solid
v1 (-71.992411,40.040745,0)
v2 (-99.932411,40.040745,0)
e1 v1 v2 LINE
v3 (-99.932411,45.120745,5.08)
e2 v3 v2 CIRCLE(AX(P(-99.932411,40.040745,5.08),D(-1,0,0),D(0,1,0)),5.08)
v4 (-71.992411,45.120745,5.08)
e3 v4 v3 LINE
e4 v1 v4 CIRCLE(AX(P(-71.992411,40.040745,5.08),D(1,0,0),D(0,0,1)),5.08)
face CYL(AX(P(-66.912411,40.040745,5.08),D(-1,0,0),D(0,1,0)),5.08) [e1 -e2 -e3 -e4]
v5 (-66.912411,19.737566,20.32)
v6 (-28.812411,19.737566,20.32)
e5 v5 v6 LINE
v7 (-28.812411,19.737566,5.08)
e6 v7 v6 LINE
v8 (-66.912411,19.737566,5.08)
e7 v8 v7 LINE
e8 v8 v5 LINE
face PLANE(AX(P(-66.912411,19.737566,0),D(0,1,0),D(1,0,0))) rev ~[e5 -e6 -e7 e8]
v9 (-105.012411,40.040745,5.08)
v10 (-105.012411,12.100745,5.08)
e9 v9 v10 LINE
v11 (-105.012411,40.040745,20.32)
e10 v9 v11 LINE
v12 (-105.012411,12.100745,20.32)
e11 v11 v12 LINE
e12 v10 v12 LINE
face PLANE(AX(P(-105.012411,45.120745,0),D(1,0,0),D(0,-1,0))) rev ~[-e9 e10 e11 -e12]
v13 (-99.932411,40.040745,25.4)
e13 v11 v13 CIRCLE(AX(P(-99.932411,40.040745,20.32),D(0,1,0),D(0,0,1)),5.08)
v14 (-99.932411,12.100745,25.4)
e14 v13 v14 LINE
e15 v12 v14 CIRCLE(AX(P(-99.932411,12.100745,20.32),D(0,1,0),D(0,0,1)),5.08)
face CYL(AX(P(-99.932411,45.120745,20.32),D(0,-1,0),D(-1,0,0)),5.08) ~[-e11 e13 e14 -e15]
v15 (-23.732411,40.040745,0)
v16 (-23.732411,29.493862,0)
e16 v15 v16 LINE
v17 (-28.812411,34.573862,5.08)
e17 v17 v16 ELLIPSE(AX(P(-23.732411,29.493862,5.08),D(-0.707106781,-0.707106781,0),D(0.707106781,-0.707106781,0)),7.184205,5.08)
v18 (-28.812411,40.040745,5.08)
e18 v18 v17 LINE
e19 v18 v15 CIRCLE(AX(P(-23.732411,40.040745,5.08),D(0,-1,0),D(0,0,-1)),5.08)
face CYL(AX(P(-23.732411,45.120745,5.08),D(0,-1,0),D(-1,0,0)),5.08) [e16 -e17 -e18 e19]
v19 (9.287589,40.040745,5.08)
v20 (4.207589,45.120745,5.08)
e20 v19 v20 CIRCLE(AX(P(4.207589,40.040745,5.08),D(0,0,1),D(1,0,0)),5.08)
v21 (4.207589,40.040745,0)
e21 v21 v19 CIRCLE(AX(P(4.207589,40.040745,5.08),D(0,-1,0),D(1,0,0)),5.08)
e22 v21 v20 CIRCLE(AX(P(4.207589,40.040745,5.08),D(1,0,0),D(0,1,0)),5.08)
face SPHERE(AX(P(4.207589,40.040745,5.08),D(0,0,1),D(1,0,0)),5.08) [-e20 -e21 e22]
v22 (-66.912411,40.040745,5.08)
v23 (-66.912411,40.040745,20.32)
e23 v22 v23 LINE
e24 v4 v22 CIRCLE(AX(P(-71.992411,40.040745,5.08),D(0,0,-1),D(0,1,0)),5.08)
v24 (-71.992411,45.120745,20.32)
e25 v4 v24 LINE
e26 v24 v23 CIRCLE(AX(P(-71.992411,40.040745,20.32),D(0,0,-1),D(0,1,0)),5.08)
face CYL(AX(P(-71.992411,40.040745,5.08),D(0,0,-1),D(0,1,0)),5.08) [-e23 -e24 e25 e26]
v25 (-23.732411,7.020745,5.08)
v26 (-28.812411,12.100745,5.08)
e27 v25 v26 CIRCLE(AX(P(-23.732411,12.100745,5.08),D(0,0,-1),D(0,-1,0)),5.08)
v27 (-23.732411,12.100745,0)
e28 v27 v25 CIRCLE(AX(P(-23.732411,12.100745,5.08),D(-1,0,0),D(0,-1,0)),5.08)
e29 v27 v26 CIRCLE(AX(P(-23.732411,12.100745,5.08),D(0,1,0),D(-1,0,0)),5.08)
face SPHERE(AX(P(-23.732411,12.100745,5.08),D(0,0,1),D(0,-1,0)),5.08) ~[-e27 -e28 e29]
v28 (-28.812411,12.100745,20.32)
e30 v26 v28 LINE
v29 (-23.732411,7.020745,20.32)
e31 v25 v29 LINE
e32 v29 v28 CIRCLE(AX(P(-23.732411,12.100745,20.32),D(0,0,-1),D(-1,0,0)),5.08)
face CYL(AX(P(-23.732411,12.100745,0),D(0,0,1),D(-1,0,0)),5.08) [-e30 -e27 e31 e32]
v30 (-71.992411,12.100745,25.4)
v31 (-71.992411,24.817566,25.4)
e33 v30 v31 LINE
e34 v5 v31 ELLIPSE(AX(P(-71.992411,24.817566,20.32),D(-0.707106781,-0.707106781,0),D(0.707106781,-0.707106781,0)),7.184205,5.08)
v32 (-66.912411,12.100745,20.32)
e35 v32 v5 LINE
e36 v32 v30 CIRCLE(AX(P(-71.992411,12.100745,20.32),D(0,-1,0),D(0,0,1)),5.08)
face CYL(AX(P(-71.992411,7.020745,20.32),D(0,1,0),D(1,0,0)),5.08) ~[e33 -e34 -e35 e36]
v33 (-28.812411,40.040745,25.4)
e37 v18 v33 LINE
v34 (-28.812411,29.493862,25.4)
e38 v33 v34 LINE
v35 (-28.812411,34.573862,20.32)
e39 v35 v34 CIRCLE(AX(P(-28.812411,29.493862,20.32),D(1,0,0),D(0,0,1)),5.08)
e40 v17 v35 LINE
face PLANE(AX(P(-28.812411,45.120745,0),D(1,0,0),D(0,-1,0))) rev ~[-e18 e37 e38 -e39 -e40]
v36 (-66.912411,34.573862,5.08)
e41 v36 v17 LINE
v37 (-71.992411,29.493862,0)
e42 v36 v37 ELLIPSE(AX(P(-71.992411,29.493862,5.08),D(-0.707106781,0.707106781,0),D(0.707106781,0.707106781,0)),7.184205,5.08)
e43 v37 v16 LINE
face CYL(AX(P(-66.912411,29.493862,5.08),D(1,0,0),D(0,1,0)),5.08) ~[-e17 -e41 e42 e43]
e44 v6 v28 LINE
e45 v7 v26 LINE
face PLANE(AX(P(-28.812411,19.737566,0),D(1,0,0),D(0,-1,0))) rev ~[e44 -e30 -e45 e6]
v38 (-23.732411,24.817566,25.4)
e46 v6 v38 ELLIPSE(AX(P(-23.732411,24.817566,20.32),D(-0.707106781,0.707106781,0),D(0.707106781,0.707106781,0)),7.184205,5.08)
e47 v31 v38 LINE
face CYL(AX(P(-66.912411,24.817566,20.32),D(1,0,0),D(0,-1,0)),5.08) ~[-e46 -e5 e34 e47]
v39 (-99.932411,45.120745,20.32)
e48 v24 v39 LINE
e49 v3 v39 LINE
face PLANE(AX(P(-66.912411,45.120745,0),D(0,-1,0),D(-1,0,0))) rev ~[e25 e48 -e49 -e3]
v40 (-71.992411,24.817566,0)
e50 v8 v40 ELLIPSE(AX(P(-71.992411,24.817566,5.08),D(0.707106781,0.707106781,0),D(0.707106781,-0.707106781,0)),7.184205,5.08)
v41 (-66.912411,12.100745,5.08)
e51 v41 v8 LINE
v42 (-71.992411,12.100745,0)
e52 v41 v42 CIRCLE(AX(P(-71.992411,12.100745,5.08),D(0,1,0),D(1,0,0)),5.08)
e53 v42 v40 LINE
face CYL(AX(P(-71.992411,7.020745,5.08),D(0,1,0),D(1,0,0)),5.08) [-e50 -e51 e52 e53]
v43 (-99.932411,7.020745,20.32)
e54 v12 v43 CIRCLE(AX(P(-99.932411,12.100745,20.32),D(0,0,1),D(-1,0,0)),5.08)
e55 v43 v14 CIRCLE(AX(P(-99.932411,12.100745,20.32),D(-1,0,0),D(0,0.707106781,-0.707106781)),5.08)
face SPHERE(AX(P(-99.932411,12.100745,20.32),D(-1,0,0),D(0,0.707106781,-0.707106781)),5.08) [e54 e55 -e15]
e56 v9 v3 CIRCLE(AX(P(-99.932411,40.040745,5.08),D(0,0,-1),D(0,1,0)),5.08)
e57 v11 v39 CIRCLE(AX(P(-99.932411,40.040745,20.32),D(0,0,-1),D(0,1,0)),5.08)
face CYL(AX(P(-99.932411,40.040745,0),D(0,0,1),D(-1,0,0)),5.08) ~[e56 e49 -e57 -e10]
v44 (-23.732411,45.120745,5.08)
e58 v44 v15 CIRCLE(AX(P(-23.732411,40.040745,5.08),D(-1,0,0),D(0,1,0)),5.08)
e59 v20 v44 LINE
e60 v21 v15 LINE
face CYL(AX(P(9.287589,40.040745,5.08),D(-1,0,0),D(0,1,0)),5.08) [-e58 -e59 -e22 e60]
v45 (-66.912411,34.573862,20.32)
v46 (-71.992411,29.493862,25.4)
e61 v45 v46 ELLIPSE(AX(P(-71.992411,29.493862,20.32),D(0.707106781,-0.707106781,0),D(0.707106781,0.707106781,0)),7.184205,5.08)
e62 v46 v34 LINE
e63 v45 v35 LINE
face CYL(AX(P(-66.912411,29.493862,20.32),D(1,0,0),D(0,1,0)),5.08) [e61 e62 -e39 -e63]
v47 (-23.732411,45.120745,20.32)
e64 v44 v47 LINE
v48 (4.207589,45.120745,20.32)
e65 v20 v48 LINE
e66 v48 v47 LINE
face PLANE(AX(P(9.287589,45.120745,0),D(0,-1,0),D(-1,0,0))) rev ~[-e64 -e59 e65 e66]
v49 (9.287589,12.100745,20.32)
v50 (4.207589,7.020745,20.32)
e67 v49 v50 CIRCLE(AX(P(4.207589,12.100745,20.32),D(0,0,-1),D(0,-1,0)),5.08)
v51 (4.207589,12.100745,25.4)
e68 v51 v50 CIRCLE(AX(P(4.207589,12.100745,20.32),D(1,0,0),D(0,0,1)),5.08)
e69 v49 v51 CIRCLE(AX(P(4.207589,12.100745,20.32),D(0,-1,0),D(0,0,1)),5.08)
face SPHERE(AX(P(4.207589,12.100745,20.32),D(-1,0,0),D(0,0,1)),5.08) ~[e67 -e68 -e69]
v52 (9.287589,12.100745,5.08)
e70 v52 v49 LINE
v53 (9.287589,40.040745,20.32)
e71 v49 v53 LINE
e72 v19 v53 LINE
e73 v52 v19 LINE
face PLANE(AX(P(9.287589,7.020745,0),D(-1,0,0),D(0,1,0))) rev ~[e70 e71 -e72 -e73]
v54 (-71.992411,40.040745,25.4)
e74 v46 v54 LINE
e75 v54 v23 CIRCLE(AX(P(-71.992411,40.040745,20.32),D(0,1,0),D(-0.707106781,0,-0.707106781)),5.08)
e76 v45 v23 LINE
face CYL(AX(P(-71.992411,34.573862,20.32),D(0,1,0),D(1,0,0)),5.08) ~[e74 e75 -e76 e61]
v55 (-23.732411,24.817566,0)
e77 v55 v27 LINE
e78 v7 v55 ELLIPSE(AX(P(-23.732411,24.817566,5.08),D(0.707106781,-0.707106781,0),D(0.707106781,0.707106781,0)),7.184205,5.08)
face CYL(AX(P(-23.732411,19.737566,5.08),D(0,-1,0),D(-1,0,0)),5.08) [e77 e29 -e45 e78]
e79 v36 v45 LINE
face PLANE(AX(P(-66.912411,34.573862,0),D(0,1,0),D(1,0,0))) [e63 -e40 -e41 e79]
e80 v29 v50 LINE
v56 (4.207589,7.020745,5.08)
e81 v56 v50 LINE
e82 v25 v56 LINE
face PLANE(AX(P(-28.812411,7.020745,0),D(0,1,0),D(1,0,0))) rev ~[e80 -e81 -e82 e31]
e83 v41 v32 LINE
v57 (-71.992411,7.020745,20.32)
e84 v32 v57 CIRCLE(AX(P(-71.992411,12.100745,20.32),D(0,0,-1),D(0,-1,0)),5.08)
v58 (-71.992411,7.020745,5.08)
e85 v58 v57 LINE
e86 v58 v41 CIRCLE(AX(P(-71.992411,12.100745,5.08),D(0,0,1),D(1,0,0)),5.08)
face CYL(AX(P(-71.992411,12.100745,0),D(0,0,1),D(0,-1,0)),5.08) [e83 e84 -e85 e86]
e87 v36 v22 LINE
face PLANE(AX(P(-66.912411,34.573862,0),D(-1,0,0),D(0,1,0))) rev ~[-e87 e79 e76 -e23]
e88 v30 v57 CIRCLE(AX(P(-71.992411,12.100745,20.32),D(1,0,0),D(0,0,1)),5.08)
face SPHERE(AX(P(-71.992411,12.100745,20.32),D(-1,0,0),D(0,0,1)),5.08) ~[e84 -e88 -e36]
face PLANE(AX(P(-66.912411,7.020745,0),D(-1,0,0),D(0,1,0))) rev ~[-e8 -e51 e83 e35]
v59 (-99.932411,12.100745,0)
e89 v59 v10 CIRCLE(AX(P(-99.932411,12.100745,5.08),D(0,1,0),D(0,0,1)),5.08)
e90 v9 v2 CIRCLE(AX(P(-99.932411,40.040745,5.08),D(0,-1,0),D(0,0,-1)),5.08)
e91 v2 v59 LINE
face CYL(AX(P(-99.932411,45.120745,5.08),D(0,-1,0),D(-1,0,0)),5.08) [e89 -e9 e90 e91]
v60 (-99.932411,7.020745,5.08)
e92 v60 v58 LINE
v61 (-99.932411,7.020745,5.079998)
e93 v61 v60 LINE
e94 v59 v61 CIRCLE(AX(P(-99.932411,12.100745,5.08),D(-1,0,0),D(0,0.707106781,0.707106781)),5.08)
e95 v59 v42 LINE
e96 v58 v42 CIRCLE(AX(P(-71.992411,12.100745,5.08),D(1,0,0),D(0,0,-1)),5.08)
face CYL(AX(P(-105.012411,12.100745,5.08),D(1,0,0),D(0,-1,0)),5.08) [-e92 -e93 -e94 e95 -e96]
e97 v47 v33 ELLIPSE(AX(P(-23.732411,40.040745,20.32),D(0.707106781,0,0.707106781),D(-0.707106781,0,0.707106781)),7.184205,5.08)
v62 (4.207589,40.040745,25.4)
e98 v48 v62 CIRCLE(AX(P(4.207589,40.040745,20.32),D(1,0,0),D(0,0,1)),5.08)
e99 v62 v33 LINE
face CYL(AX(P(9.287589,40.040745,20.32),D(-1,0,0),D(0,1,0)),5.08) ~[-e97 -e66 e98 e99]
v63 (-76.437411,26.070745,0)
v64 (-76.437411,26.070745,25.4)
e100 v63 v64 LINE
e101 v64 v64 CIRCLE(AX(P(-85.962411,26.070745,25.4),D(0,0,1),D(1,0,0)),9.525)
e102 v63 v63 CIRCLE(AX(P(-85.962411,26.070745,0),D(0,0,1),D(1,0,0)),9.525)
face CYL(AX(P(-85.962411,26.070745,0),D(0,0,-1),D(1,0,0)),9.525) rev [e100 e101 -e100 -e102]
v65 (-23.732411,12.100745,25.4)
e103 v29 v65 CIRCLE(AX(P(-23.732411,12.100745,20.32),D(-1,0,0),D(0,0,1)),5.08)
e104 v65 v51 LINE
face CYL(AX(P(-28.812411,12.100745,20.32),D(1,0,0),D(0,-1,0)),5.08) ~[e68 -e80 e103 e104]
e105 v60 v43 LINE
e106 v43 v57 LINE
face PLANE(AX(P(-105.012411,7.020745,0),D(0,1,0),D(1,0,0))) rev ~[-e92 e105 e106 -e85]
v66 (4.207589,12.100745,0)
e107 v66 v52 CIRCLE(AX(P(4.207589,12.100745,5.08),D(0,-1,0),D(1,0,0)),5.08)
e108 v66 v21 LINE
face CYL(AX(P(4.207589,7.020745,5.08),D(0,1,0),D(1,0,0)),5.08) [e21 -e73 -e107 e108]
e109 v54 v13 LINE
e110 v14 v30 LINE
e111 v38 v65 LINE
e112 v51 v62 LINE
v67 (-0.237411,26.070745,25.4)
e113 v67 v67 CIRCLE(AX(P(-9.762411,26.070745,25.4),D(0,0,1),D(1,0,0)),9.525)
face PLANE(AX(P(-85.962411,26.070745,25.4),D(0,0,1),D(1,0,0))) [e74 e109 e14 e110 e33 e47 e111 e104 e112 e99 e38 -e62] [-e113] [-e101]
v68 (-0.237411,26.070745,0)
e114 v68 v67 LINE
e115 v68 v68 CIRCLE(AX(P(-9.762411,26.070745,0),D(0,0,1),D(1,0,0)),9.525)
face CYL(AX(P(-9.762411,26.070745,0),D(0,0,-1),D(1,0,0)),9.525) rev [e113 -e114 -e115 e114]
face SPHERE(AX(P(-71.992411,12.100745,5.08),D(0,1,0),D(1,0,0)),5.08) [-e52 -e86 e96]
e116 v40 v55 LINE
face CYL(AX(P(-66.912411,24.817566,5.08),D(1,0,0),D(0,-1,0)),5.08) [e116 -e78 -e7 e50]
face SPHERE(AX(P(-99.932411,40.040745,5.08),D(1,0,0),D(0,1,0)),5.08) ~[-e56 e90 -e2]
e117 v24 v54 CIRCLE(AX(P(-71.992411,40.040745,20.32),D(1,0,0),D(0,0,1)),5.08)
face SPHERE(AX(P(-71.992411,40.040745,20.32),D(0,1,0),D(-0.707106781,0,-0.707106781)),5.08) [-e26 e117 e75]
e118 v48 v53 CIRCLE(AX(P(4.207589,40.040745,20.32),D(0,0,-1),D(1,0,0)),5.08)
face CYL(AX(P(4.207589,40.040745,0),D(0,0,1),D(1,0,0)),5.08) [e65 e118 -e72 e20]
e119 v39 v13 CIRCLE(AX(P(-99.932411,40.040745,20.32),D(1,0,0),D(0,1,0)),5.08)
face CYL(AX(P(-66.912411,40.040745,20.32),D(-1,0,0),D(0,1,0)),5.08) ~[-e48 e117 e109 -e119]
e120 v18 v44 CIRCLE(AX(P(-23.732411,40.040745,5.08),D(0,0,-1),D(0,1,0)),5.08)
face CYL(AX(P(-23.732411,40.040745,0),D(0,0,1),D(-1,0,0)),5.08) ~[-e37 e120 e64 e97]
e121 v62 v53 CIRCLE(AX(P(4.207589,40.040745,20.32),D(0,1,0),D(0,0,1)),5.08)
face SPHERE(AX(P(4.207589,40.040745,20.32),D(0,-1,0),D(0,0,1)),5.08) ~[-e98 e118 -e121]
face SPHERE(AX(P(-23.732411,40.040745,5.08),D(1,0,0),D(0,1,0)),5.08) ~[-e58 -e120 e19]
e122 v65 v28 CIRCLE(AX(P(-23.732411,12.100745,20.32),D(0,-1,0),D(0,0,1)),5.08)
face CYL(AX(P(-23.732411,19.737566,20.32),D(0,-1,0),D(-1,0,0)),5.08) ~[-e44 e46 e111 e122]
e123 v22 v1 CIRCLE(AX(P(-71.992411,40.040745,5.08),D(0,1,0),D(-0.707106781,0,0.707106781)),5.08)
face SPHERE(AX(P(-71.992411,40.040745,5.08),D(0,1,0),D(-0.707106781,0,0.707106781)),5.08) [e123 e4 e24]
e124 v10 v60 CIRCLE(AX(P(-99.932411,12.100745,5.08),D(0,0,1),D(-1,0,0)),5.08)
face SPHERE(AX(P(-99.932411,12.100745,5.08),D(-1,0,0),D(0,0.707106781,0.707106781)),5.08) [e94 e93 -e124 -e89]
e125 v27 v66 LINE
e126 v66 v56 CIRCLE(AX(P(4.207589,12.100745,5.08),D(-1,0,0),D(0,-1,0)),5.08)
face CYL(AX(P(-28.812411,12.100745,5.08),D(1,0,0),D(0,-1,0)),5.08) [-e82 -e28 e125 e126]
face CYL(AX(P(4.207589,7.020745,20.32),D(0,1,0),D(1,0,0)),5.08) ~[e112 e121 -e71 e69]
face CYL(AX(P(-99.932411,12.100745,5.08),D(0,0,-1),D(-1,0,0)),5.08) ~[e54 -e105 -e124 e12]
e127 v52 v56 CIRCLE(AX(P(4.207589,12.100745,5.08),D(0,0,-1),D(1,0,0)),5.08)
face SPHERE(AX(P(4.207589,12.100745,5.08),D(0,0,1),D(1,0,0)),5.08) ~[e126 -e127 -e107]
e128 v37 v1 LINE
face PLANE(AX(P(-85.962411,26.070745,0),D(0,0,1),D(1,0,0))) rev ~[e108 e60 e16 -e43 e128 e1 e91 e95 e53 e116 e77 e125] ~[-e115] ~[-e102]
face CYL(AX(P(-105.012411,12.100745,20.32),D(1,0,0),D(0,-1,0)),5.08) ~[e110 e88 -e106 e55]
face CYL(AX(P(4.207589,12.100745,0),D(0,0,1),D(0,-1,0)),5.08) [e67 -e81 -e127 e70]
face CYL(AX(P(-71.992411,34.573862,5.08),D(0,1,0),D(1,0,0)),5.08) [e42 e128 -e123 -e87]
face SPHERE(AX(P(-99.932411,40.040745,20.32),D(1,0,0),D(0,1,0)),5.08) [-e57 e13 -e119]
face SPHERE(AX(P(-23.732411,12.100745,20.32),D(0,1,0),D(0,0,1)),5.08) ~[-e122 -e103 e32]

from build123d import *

# Parameters (mm, degrees)
F0_R         = 9.525
F0_W         = 38.1
F0_H         = 14.8362964392
F1_DEPTH     = 25.4
F2_R         = 5.08
F3_T1_DEPTH  = 15.24
F3_S5_W      = 5.08
F3_S5_H      = 5.08
F3_T6_DEPTH  = 5.08
F3_S11_W     = 5.08
F3_S11_H     = 5.08
F3_T12_DEPTH = 5.08
F3_S17_W     = 5.08
F3_S17_H     = 5.08
F3_T18_DEPTH = 5.08
F3_S23_W     = 5.08
F3_S23_H     = 5.08
F3_T24_DEPTH = 5.08


# Not quite as in the source:
# - a fillet or chamfer that OpenCascade refuses, or shapes differently, is made with other operations: its cross-section is extruded or revolved along the edge and cut away or added


with BuildPart() as f1:
    # F0 (on Top) → F1 (new body)
    with BuildSketch(Plane.XY):
        Polygon((-105.0124109644, 7.0207449608), (-66.9124109644, 7.0207449608), (-66.9124109644, 19.73756589), (-66.9124109644, 34.5738623291), (-66.9124109644, 45.1207449608), (-105.0124109644, 45.1207449608), align=None)
        with Locations((-85.9624109644, 26.0707449608)):
            Circle(F0_R, mode=Mode.SUBTRACT)
        with Locations((-47.8624109644, 27.1557141095)):
            Rectangle(F0_W, F0_H)
        Polygon((-28.8124109644, 34.5738623291), (-28.8124109644, 19.73756589), (-28.8124109644, 7.0207449608), (9.2875890356, 7.0207449608), (9.2875890356, 45.1207449608), (-28.8124109644, 45.1207449608), align=None)
        with Locations((-9.7624109644, 26.0707449608)):
            Circle(F0_R, mode=Mode.SUBTRACT)
    extrude(amount=F1_DEPTH)

    # F2
    f2_edges = [f1.edges().sort_by_distance(p)[0] for p in [
        (-85.962411, 45.120745, 25.4),
        (-85.962411, 45.120745, 0),
        (-105.012411, 45.120745, 12.7),
        (-105.012411, 26.070745, 0),
        (-105.012411, 26.070745, 25.4),
        (-85.962411, 7.020745, 25.4),
        (-47.862411, 19.737566, 25.4),
        (-47.862411, 34.573862, 25.4),
        (-66.912411, 39.847304, 25.4),
        (-66.912411, 13.379155, 25.4),
        (-28.812411, 13.379155, 25.4),
        (-9.762411, 7.020745, 25.4),
        (9.287589, 26.070745, 25.4),
        (-9.762411, 45.120745, 25.4),
        (9.287589, 7.020745, 12.7),
        (9.287589, 45.120745, 12.7),
        (9.287589, 26.070745, 0),
        (-47.862411, 19.737566, 0),
        (-66.912411, 13.379155, 0),
        (-66.912411, 7.020745, 12.7),
        (-28.812411, 7.020745, 12.7),
        (-85.962411, 7.020745, 0),
        (-47.862411, 34.573862, 0),
        (-9.762411, 45.120745, 0),
        (-28.812411, 45.120745, 12.7),
        (-28.812411, 39.847304, 0),
        (-66.912411, 39.847304, 0),
        (-9.762411, 7.020745, 0),
        (-28.812411, 13.379155, 0),
    ]]
    fillet(f2_edges, radius=F2_R)

    # F3: fillet of radius 5.08 on 2 edges, made by hand

    # F3_s2 → F3_t1 (cut)
    with BuildSketch(Plane.XY.offset(5.08)):
        with BuildLine():
            ThreePointArc((-71.9924109644, 45.1207449608), (-68.4003085159, 43.6328474092), (-66.9124109644, 40.0407449608))
            Line((-66.9124109644, 40.0407449608), (-66.9124109644, 45.1207449608))
            Line((-66.9124109644, 45.1207449608), (-71.9924109644, 45.1207449608))
        make_face()
        with BuildLine():
            ThreePointArc((-105.0124109644, 12.1007449608), (-103.5245134128, 8.5086425123), (-99.9324109644, 7.0207449608))
            Line((-99.9324109644, 7.0207449608), (-105.0124109644, 7.0207449608))
            Line((-105.0124109644, 7.0207449608), (-105.0124109644, 12.1007449608))
        make_face()
    extrude(amount=F3_T1_DEPTH, mode=Mode.SUBTRACT)


with BuildPart() as f3_tool4:
    # F3_s5 → F3_t6 (new body)
    with BuildSketch(Plane.YZ.offset(-99.9324109644)):
        with Locations((9.5607449608, 2.54)):
            Rectangle(F3_S5_W, F3_S5_H)
    extrude(amount=-F3_T6_DEPTH)

    # F3_s7 → F3_t8 (revolve, cut)
    with BuildSketch(Plane(origin=(-99.9324109644, 12.1007449608, 5.08), x_dir=(0, 0.7071067812, 0.7071067812), z_dir=(0, -0.7071067812, 0.7071067812))):
        with BuildLine():
            ThreePointArc((0, -5.08), (5.08, 0), (0, 5.08))
            Line((0, 5.08), (0, -5.08))
        make_face()
    revolve(axis=Axis((-99.9324109644, 12.1007449608, 5.08), (-1, 0, 0)), mode=Mode.SUBTRACT)


with BuildPart() as f1_1:
    add(f1.part)

    # F3_t3: cut F3_tool4
    add(f3_tool4.part, mode=Mode.SUBTRACT)


with BuildPart() as f3_tool10:
    # F3_s11 → F3_t12 (new body)
    with BuildSketch(Plane.YZ.offset(-99.9324109644)):
        with Locations((9.5607449608, 22.86)):
            Rectangle(F3_S11_W, F3_S11_H)
    extrude(amount=-F3_T12_DEPTH)

    # F3_s13 → F3_t14 (revolve, cut)
    with BuildSketch(Plane(origin=(-99.9324109644, 12.1007449608, 20.32), x_dir=(0, 0.7071067812, -0.7071067812), z_dir=(0, 0.7071067812, 0.7071067812))):
        with BuildLine():
            ThreePointArc((0, -5.08), (5.08, 0), (0, 5.08))
            Line((0, 5.08), (0, -5.08))
        make_face()
    revolve(axis=Axis((-99.9324109644, 12.1007449608, 20.32), (-1, 0, 0)), mode=Mode.SUBTRACT)


with BuildPart() as f1_2:
    add(f1_1.part)

    # F3_t9: cut F3_tool10
    add(f3_tool10.part, mode=Mode.SUBTRACT)


with BuildPart() as f3_tool16:
    # F3_s17 → F3_t18 (new body)
    with BuildSketch(Plane.XZ.offset(-40.0407449608)):
        with Locations((-69.4524109644, 2.54)):
            Rectangle(F3_S17_W, F3_S17_H)
    extrude(amount=-F3_T18_DEPTH)

    # F3_s19 → F3_t20 (revolve, cut)
    with BuildSketch(Plane(origin=(-71.9924109644, 40.0407449608, 5.08), x_dir=(-0.7071067812, 0, 0.7071067812), z_dir=(-0.7071067812, 0, -0.7071067812))):
        with BuildLine():
            ThreePointArc((0, -5.08), (5.08, 0), (0, 5.08))
            Line((0, 5.08), (0, -5.08))
        make_face()
    revolve(axis=Axis((-71.9924109644, 40.0407449608, 5.08), (0, 1, 0)), mode=Mode.SUBTRACT)


with BuildPart() as f1_3:
    add(f1_2.part)

    # F3_t15: cut F3_tool16
    add(f3_tool16.part, mode=Mode.SUBTRACT)


with BuildPart() as f3_tool22:
    # F3_s23 → F3_t24 (new body)
    with BuildSketch(Plane.XZ.offset(-40.0407449608)):
        with Locations((-69.4524109644, 22.86)):
            Rectangle(F3_S23_W, F3_S23_H)
    extrude(amount=-F3_T24_DEPTH)

    # F3_s25 → F3_t26 (revolve, cut)
    with BuildSketch(Plane(origin=(-71.9924109644, 40.0407449608, 20.32), x_dir=(-0.7071067812, 0, -0.7071067812), z_dir=(0.7071067812, 0, -0.7071067812))):
        with BuildLine():
            ThreePointArc((0, -5.08), (5.08, 0), (0, 5.08))
            Line((0, 5.08), (0, -5.08))
        make_face()
    revolve(axis=Axis((-71.9924109644, 40.0407449608, 20.32), (0, 1, 0)), mode=Mode.SUBTRACT)


with BuildPart() as f1_4:
    add(f1_3.part)

    # F3_t21: cut F3_tool22
    add(f3_tool22.part, mode=Mode.SUBTRACT)


solid = f1_4.part
